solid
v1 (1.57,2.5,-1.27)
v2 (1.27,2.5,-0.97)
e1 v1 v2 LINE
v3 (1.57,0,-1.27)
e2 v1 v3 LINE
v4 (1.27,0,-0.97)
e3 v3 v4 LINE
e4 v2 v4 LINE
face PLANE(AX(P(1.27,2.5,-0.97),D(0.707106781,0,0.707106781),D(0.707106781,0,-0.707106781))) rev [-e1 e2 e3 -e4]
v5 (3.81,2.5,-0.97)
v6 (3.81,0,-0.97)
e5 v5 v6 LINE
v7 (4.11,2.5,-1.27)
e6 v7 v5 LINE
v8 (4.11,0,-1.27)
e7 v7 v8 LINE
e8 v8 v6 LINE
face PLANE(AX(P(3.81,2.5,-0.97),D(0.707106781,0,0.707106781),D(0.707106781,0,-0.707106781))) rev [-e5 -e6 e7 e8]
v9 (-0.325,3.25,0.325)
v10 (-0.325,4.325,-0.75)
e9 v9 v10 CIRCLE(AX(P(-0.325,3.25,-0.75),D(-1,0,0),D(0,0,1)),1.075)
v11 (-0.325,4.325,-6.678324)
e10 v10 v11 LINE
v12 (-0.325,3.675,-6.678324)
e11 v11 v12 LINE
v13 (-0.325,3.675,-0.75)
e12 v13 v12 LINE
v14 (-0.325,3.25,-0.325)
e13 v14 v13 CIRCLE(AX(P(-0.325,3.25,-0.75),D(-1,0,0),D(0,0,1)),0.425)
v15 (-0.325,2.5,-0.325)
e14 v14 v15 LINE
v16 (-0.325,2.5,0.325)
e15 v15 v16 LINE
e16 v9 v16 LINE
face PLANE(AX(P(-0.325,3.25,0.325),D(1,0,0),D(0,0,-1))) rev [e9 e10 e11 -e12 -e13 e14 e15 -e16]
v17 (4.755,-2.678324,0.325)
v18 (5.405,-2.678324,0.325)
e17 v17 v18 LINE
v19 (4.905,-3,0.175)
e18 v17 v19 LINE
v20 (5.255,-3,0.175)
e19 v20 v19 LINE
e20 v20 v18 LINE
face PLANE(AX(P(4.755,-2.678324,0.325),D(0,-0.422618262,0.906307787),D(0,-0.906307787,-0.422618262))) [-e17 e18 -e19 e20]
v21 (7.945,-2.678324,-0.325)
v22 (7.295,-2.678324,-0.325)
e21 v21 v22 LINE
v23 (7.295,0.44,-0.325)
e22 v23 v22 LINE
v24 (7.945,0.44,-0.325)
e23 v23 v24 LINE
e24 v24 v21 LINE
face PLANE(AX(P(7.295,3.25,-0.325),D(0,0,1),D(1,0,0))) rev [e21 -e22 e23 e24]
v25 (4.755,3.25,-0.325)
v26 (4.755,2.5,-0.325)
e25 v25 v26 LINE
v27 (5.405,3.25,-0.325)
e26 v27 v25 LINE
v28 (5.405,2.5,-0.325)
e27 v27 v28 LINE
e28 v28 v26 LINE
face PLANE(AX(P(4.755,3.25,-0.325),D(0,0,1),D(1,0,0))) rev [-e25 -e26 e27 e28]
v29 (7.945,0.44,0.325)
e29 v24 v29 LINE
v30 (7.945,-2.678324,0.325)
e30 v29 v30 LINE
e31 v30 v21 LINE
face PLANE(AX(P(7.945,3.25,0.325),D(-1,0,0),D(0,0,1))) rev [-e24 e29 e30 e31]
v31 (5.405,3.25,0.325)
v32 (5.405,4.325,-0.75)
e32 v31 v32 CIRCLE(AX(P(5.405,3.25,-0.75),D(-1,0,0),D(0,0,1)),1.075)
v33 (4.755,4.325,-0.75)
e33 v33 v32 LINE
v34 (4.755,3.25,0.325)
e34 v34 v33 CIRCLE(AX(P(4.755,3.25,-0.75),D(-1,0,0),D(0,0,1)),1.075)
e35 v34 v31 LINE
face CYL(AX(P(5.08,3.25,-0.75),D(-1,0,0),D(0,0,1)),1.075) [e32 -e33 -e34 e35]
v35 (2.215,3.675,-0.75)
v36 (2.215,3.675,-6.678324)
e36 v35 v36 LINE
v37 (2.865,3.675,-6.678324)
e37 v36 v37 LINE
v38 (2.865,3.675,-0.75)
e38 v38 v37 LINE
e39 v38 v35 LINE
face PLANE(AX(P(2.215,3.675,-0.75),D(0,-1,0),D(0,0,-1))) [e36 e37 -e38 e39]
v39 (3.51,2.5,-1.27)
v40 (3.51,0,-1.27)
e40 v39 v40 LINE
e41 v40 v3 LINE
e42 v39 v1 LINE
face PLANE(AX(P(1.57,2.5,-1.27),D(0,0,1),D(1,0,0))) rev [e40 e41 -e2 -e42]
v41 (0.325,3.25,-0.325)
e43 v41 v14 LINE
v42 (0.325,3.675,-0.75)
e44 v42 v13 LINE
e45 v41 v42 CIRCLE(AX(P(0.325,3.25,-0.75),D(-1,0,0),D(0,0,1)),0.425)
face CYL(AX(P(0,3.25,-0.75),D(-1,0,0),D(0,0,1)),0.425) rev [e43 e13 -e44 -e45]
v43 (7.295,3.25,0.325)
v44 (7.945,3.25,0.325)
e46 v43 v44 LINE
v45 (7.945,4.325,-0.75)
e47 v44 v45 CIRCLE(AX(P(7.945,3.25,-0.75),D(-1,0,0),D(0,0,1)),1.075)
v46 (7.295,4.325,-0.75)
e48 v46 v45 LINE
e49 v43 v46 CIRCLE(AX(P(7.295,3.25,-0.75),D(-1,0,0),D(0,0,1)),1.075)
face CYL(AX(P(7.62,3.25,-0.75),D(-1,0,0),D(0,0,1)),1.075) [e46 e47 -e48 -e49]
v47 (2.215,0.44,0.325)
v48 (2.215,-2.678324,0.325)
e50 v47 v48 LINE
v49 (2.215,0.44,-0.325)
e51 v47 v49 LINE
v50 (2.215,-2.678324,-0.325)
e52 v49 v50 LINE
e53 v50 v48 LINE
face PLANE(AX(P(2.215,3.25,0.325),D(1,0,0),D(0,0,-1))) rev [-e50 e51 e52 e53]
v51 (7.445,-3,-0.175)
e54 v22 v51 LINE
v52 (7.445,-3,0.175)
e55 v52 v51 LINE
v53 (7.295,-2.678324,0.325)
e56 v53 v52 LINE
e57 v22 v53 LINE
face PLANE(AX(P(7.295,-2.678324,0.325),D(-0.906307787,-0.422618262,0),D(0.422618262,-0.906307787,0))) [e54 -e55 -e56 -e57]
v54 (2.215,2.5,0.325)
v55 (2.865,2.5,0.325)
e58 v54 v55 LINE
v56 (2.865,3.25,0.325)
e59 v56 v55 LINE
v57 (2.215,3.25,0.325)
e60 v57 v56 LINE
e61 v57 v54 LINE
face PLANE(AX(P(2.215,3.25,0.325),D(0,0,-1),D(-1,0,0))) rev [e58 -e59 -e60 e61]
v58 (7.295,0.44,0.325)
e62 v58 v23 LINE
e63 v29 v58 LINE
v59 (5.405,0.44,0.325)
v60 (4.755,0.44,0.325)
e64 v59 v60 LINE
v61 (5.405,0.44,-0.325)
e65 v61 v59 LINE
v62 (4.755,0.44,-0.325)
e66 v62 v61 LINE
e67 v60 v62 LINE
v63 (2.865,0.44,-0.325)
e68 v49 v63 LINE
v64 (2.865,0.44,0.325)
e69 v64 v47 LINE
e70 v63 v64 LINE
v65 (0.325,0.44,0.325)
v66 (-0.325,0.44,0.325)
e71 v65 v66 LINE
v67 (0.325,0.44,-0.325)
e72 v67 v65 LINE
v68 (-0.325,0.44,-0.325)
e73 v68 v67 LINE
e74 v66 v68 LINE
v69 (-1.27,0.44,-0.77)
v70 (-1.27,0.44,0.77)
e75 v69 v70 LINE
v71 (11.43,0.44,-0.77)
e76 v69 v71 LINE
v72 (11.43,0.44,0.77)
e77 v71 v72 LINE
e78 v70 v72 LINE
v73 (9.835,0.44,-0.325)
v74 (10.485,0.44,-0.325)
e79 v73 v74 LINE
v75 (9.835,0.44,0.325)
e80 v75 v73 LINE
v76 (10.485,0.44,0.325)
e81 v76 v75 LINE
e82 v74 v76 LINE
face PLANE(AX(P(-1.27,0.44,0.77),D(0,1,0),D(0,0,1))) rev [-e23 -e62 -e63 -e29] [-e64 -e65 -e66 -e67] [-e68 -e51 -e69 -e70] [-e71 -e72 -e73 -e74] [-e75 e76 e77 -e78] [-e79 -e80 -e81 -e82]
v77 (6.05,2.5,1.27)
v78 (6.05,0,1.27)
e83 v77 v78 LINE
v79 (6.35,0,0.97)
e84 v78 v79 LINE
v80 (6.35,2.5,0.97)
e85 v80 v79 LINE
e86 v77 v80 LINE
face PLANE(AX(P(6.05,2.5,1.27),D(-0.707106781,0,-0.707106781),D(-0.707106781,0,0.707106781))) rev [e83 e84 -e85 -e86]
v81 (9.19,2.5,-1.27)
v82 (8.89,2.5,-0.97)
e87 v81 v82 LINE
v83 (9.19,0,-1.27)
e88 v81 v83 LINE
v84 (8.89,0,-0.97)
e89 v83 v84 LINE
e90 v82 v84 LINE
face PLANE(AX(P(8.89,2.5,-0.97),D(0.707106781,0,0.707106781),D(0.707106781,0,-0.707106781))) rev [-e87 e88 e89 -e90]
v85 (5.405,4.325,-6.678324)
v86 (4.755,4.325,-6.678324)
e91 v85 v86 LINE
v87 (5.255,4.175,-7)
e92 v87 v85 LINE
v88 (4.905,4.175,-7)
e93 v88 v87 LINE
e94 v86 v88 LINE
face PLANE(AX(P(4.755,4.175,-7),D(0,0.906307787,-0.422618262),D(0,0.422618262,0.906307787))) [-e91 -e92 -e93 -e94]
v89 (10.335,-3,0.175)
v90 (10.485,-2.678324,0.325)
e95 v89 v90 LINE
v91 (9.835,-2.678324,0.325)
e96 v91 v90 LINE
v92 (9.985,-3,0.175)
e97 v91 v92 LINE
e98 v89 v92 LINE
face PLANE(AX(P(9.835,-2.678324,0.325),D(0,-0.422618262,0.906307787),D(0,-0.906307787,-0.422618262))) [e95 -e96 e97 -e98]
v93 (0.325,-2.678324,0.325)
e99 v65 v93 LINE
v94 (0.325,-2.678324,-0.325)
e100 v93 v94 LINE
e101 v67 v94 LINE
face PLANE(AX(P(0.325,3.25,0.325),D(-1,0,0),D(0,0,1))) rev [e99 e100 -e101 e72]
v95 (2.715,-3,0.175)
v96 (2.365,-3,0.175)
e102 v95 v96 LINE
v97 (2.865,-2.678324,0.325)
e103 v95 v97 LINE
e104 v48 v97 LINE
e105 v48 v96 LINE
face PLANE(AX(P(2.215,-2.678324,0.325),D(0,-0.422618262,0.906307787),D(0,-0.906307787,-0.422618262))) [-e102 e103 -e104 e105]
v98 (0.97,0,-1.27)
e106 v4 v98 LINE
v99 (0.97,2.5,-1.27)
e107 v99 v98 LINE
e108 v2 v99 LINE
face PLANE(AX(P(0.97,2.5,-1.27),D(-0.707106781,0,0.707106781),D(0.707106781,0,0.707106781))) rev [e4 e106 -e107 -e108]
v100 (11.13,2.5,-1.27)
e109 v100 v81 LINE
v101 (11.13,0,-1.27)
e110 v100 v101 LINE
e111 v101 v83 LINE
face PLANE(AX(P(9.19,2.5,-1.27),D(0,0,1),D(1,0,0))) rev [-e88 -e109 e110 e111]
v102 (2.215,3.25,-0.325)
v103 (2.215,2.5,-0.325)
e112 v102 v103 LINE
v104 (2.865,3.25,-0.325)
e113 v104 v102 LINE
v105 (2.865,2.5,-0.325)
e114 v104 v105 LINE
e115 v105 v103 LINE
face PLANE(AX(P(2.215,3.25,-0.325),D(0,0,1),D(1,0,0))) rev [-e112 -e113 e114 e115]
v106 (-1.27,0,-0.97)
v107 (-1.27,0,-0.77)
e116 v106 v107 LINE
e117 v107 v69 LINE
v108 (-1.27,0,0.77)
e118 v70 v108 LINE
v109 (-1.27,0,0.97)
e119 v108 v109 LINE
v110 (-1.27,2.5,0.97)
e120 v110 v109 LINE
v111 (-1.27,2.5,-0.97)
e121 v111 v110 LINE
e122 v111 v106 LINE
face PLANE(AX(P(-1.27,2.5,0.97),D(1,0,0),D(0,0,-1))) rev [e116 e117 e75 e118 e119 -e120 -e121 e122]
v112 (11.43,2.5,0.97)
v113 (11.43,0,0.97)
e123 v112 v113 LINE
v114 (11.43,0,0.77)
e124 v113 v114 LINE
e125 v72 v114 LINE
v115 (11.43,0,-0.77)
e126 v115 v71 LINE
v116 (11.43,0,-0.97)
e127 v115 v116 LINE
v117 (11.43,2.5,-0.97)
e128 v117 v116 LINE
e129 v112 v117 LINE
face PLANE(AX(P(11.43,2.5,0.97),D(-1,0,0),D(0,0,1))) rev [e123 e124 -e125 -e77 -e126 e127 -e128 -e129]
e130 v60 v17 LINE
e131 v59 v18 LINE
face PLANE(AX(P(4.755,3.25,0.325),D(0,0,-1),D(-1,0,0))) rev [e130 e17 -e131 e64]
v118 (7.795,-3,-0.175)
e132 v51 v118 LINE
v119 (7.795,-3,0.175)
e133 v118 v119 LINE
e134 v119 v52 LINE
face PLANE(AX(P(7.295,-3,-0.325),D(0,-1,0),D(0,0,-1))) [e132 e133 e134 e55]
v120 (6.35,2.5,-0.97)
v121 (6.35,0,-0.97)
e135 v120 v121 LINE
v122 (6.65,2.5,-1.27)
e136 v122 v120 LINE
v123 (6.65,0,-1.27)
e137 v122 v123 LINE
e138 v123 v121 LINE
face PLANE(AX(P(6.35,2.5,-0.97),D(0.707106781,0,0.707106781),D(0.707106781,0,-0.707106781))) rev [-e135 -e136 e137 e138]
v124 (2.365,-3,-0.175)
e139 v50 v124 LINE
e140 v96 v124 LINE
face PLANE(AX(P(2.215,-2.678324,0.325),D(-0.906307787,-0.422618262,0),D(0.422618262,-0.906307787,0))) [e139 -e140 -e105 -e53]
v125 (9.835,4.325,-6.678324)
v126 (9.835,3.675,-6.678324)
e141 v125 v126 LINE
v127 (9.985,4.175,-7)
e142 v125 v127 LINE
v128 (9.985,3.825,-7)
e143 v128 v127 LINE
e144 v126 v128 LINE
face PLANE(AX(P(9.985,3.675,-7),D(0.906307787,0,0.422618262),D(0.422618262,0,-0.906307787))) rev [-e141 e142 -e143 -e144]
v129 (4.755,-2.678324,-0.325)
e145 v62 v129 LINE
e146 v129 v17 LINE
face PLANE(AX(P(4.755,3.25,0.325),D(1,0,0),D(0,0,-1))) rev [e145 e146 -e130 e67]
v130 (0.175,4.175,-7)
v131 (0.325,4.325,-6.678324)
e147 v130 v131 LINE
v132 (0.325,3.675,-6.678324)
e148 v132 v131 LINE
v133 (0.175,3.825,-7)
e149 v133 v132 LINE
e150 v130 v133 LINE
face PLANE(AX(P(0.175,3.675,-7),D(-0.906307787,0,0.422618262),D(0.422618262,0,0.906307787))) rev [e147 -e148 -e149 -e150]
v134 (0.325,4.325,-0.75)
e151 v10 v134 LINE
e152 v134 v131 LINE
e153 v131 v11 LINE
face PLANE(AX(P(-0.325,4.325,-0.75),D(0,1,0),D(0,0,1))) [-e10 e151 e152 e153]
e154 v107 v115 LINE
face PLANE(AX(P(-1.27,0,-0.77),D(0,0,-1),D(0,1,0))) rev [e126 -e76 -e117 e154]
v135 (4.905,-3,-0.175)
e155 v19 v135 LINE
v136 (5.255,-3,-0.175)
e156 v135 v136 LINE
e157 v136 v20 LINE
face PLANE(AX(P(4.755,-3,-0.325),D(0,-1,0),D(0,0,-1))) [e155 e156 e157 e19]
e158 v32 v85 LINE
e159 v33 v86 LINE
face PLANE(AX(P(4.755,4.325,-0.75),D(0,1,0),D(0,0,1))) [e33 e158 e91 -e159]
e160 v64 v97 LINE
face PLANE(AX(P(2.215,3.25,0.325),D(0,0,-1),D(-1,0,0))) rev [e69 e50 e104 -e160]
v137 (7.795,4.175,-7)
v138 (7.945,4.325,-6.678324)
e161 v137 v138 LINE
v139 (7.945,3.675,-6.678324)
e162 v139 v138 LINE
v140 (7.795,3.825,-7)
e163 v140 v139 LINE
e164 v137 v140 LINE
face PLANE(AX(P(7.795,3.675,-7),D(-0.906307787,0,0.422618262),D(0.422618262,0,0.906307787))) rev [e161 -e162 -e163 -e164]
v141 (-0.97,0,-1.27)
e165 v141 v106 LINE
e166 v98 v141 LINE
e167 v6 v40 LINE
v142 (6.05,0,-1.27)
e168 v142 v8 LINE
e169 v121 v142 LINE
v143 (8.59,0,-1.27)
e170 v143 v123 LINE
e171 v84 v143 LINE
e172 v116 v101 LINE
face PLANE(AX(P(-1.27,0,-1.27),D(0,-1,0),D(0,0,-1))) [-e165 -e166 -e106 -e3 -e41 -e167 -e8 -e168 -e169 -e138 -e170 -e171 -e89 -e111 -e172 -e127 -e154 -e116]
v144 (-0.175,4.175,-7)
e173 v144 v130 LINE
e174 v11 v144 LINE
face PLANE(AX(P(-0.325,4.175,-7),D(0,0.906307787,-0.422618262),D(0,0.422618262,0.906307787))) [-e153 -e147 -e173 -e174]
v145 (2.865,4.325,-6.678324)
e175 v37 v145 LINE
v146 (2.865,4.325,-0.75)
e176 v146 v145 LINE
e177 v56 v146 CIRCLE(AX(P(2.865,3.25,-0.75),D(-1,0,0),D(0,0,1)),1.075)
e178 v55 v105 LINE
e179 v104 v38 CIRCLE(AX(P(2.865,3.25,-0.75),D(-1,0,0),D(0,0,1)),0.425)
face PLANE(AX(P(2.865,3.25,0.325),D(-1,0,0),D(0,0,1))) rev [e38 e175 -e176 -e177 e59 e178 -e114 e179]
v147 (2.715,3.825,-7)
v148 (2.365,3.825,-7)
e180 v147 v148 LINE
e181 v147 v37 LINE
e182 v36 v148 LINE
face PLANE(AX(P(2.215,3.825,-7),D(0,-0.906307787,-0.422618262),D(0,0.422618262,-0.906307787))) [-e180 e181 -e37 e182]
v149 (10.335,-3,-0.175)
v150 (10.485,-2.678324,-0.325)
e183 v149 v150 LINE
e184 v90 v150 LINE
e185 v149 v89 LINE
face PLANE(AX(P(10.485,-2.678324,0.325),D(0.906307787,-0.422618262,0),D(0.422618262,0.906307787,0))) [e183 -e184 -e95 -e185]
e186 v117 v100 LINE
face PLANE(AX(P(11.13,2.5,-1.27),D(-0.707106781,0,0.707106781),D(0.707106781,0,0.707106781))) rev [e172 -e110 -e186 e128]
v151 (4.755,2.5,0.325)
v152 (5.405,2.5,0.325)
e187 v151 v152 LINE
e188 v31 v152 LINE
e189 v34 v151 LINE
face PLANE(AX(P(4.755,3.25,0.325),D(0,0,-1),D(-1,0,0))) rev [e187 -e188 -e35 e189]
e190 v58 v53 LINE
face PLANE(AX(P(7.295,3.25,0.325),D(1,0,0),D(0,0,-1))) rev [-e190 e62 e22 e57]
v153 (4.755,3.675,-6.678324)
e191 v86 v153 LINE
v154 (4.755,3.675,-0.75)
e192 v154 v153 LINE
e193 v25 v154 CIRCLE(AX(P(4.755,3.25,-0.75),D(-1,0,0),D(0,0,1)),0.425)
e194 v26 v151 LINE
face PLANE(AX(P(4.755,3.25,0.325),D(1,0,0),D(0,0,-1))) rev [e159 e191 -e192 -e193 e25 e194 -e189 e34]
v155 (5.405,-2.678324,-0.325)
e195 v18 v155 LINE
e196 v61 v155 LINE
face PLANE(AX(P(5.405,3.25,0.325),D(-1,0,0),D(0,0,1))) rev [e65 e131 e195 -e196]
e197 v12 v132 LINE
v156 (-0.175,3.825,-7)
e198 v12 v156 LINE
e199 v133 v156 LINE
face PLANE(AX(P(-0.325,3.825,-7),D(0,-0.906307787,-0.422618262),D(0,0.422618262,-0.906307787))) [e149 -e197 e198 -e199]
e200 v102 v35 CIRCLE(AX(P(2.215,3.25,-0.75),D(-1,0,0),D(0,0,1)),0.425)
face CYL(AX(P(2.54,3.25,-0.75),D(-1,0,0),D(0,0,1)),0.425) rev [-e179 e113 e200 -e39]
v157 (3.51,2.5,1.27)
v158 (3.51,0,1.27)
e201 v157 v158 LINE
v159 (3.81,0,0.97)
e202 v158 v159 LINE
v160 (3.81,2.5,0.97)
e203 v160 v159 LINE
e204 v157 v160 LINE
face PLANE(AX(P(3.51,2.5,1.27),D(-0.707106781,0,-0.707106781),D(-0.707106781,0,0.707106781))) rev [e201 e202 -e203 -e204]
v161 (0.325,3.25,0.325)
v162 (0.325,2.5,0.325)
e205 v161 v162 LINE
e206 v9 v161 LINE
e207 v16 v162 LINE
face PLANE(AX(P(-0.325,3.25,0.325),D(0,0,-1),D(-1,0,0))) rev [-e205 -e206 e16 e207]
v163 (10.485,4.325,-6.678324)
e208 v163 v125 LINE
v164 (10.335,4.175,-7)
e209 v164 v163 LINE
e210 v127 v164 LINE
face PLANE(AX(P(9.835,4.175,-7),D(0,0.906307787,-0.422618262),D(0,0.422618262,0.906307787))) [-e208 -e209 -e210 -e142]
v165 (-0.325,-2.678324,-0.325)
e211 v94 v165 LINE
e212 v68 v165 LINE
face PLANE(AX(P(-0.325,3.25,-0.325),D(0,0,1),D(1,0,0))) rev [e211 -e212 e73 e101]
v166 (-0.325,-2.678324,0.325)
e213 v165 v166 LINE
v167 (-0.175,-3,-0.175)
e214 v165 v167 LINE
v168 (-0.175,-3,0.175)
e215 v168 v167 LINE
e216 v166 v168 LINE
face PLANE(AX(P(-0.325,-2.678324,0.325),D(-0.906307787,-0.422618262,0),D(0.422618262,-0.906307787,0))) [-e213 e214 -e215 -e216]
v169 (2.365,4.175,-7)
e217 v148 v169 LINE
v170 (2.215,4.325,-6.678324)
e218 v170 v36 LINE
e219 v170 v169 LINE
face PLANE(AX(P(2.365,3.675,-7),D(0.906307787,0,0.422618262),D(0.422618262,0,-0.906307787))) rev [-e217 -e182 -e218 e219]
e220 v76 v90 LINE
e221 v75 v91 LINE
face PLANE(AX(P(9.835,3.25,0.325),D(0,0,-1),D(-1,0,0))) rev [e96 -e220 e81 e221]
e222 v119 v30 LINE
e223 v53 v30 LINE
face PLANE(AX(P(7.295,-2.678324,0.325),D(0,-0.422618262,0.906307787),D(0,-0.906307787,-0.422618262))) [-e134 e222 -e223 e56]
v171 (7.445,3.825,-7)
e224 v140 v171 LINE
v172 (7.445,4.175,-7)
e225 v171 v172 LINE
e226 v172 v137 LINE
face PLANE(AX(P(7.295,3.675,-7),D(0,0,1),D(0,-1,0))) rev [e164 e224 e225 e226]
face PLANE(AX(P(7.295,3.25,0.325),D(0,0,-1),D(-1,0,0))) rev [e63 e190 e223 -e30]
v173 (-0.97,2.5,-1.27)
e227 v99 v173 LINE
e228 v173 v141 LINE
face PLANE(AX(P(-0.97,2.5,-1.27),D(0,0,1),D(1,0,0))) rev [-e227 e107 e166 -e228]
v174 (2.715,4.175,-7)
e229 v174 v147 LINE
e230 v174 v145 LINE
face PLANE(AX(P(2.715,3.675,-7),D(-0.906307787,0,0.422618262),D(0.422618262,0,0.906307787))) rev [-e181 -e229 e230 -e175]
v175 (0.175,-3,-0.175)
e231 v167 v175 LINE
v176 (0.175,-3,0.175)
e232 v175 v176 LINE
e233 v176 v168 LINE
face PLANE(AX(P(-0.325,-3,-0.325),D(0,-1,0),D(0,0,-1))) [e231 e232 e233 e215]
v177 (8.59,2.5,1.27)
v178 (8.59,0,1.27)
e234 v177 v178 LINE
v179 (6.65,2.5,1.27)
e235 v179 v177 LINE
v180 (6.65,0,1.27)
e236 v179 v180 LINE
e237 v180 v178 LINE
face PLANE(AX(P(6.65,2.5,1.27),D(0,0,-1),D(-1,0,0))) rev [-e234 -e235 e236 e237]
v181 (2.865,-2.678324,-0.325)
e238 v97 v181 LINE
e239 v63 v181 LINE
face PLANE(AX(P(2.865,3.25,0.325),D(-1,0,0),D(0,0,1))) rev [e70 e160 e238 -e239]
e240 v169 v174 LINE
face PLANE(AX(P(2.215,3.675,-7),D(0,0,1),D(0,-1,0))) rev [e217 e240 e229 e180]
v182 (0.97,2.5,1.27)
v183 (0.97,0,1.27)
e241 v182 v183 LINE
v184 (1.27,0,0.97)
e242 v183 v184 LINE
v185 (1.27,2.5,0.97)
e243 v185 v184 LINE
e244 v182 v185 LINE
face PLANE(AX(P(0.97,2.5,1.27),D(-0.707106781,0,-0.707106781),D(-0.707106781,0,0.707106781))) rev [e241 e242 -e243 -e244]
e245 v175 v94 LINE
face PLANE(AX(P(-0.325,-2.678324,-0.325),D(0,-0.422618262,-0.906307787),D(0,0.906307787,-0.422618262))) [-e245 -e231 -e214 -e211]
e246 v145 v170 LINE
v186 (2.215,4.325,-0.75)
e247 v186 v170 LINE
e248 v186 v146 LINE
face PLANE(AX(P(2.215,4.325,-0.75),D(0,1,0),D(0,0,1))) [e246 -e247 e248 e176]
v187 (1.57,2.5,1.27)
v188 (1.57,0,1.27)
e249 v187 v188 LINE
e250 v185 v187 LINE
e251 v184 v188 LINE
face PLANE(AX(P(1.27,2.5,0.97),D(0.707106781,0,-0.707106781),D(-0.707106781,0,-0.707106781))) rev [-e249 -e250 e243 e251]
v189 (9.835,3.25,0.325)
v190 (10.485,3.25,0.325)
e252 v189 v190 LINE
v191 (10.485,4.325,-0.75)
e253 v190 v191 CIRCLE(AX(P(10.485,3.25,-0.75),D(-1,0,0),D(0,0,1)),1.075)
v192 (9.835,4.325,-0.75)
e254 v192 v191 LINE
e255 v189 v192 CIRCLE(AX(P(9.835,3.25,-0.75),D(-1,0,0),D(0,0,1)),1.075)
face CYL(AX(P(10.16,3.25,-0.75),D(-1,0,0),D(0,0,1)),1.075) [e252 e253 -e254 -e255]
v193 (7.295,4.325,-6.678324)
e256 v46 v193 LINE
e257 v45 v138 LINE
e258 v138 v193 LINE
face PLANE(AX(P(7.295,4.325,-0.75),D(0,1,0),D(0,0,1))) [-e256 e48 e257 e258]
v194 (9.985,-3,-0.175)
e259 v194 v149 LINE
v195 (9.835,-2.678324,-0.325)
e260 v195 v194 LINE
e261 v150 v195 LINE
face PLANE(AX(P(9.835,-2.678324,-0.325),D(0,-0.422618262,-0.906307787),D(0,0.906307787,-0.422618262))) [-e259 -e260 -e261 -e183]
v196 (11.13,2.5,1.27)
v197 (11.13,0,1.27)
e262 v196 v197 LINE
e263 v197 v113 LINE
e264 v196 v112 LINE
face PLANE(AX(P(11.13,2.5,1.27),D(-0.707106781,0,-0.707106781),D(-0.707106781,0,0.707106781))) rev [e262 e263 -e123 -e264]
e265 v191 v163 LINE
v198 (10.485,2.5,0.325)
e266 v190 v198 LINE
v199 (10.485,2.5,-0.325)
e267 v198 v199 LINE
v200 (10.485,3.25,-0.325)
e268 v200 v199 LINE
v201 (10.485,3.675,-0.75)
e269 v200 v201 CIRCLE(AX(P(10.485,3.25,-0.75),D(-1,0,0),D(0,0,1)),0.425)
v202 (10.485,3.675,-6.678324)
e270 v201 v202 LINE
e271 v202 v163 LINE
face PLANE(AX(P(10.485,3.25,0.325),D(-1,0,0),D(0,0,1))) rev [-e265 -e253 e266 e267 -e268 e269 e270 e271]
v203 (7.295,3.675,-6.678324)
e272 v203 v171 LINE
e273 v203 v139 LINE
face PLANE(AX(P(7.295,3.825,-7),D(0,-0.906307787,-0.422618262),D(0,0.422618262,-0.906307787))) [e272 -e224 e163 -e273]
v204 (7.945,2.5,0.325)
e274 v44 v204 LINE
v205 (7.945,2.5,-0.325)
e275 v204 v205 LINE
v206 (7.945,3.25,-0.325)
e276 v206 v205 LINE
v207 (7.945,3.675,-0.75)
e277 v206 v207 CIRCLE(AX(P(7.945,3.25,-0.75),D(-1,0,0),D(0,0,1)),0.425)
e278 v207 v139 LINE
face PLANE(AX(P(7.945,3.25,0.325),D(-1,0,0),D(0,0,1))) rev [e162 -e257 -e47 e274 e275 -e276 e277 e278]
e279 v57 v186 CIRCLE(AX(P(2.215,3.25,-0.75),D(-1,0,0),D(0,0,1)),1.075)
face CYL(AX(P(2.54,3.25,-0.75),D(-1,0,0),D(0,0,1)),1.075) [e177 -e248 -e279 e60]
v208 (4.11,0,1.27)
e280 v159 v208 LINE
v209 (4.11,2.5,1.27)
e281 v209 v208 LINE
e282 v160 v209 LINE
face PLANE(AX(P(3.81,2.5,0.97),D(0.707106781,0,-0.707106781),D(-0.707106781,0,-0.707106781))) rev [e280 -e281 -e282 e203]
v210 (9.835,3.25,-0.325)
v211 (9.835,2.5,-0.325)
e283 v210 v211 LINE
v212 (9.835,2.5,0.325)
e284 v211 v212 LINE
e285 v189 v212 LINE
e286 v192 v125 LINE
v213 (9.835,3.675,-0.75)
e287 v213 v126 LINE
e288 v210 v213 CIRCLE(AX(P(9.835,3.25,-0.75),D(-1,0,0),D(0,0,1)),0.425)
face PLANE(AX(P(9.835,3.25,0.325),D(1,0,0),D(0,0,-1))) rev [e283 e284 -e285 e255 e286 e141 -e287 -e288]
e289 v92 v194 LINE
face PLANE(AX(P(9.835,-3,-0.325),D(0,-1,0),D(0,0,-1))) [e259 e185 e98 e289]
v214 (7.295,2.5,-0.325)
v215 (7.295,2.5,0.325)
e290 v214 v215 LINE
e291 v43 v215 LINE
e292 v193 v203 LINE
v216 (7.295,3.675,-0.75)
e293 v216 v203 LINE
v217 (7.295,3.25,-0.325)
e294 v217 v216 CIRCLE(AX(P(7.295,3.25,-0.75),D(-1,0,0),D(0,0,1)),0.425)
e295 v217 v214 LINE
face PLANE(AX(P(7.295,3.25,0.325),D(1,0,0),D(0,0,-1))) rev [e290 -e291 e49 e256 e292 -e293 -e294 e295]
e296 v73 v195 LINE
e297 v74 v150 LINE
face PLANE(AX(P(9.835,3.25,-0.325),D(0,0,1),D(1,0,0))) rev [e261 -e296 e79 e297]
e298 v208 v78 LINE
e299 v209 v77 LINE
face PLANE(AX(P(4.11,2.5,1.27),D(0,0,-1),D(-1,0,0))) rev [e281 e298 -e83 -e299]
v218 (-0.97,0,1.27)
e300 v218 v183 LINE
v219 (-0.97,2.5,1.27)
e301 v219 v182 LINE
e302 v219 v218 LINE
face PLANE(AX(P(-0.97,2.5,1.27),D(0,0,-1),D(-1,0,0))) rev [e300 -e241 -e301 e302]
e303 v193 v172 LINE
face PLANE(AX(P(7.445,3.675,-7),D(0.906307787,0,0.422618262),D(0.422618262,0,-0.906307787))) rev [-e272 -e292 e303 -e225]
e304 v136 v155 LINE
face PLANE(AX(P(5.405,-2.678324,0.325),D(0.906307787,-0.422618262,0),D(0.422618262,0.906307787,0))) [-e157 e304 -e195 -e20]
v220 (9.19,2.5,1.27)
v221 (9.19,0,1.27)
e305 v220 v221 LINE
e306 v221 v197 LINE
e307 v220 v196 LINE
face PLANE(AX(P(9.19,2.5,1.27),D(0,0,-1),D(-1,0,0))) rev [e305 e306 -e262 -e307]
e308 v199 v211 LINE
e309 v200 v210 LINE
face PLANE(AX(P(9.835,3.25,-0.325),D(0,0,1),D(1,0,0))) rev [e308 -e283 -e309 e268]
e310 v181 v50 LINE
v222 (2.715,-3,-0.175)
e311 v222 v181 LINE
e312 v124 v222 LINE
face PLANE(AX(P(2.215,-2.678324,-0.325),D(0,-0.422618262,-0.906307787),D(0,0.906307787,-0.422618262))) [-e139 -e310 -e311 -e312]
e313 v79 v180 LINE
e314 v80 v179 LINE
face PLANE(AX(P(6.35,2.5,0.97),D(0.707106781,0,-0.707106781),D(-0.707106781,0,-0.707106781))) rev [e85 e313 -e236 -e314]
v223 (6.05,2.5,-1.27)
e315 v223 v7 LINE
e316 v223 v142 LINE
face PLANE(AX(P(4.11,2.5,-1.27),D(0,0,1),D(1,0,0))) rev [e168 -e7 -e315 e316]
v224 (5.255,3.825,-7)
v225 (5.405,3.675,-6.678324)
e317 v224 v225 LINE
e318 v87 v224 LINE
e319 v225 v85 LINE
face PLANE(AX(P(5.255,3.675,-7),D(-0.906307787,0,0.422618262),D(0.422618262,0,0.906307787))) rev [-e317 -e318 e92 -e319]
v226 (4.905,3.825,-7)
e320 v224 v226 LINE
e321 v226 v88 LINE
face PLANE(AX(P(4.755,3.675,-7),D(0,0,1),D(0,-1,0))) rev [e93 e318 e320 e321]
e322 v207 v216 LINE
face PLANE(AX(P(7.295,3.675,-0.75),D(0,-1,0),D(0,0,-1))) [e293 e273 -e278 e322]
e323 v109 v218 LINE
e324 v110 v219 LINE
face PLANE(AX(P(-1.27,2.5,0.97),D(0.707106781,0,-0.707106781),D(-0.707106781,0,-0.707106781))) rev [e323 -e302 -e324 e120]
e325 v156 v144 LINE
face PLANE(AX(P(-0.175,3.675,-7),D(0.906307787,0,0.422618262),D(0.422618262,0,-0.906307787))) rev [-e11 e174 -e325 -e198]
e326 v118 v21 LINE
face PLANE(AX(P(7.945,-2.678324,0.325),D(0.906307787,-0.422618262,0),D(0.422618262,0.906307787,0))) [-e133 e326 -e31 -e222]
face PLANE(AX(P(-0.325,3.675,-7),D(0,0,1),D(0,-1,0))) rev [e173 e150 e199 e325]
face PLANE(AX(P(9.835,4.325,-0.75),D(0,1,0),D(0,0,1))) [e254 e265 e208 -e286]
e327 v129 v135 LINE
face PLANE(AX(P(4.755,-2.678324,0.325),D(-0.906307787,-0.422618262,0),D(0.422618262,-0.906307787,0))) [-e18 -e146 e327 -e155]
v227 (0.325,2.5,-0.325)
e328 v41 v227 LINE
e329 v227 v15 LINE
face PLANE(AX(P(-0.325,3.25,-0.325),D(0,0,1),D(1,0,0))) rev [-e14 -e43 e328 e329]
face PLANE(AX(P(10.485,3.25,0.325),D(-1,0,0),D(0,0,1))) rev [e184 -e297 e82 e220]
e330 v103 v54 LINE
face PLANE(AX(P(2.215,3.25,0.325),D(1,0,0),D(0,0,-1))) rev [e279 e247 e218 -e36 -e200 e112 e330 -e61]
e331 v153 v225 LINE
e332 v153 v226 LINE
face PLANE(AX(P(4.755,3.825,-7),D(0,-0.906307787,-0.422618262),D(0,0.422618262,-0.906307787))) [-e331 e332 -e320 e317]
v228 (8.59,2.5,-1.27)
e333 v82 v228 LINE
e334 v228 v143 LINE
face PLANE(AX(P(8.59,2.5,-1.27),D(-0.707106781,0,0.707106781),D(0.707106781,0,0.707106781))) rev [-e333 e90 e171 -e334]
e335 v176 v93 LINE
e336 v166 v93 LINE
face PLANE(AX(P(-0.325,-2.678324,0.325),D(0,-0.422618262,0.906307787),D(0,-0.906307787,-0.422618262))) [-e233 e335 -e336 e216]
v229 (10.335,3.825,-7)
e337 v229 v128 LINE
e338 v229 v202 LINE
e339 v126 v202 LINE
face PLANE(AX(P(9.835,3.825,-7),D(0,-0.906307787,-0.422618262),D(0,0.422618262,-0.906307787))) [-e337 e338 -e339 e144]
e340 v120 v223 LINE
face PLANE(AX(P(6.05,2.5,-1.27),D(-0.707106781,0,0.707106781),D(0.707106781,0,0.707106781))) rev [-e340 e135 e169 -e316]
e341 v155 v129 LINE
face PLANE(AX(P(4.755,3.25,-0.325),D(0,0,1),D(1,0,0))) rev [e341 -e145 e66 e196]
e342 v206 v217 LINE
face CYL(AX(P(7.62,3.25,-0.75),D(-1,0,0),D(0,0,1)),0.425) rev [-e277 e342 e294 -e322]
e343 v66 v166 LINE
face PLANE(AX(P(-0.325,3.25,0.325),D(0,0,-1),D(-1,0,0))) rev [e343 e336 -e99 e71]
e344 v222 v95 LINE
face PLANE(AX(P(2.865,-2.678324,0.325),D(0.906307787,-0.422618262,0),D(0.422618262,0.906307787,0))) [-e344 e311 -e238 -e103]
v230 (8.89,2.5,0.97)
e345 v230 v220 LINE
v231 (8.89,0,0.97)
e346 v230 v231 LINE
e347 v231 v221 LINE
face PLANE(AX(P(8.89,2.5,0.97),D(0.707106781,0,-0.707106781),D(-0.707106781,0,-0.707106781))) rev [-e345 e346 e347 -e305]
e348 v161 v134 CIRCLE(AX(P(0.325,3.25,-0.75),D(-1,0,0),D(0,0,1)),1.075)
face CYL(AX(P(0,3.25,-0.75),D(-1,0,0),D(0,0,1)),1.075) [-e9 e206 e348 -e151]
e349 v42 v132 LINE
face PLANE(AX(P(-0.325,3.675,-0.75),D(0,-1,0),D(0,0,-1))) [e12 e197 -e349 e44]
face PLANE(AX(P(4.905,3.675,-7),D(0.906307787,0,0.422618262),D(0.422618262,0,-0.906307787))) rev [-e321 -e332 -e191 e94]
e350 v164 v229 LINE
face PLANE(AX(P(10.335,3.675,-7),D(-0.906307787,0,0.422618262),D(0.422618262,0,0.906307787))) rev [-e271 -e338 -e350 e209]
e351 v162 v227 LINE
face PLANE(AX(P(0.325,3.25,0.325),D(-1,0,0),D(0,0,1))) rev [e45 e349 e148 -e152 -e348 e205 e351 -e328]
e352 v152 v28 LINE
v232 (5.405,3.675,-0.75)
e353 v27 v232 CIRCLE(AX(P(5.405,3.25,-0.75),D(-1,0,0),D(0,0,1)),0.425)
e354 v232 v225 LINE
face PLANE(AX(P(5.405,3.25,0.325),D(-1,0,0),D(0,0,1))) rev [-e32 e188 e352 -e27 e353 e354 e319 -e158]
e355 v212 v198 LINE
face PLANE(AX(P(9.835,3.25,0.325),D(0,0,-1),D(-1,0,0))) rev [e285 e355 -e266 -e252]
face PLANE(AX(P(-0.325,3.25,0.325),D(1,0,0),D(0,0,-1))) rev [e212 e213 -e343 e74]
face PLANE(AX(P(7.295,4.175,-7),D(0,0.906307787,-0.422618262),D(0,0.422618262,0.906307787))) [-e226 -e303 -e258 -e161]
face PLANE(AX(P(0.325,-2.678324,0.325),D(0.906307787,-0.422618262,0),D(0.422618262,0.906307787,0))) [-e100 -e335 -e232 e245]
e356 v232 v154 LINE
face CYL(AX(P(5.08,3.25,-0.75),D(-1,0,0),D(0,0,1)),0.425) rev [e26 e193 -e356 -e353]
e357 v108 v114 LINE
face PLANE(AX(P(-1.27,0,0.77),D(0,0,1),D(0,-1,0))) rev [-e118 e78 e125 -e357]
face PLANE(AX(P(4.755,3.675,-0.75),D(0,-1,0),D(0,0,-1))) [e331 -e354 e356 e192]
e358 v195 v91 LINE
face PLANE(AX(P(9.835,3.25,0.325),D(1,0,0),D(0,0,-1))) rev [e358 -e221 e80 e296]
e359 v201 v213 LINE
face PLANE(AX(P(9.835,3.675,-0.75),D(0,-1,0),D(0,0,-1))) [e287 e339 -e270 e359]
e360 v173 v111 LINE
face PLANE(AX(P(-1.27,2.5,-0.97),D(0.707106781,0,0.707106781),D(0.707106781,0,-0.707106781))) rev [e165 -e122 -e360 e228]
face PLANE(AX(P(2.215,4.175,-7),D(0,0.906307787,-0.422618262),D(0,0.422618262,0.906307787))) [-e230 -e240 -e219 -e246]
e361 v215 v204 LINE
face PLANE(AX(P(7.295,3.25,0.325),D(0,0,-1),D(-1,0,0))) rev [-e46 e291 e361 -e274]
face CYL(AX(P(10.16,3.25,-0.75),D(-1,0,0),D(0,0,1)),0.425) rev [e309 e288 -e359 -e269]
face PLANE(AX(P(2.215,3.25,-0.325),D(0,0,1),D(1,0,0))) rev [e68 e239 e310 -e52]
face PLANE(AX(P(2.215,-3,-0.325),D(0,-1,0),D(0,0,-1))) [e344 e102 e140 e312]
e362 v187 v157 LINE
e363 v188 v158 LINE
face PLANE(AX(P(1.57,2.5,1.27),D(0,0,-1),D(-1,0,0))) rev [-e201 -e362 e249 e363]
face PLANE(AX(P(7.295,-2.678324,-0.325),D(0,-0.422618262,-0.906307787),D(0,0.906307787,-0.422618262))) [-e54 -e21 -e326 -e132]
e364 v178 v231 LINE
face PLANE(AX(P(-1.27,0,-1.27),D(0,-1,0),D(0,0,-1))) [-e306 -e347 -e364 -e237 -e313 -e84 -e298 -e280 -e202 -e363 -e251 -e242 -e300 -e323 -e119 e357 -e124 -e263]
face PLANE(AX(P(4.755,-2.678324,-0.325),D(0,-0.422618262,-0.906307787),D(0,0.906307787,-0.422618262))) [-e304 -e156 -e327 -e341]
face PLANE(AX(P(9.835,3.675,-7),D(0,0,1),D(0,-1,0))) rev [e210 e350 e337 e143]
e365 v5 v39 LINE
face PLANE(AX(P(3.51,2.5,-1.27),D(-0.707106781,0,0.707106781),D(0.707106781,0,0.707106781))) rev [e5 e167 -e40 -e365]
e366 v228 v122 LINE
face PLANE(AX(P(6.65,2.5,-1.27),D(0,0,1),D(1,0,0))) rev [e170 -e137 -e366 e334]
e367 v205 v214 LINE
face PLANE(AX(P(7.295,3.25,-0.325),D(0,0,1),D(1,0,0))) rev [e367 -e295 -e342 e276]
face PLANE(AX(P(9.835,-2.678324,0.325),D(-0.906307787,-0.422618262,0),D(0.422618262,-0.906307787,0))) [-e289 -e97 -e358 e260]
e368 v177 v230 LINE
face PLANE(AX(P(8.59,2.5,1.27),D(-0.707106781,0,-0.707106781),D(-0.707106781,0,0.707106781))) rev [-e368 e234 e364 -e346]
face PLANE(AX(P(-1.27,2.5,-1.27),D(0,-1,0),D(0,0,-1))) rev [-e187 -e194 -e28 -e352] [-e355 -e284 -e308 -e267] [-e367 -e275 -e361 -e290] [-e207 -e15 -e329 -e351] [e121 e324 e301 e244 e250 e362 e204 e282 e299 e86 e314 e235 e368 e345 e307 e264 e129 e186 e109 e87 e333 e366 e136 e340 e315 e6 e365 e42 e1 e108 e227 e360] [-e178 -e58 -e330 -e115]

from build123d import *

# Parameters (mm, degrees)
BASE_DEPTH          = 2.5
BASE_PATTERN_COUNT  = 5
BASE_PATTERN_PITCH  = 2.54
CUT_DEPTH           = 12.768933682
CUT_DEPTH_BACK      = 12.768933682
SKETCH2_W           = 1.54
SKETCH2_H           = 0.44
SKETCH3_W           = 0.65
SKETCH3_H           = 0.65
PIN_CHAMFER_SIZE    = 0.15
PIN_CHAMFER_SIZE2   = 0.321676038
CHAMFER1_SIZE       = 0.15
CHAMFER1_SIZE2      = 0.321676038
PIN_START           = 2.215
PIN_PATTERN_DEPTH   = 0.65
PIN_START_2         = 4.755
PIN_PATTERN_2_DEPTH = 0.65
PIN_START_3         = 7.295
PIN_PATTERN_3_DEPTH = 0.65
PIN_START_4         = 9.835
PIN_PATTERN_4_DEPTH = 0.65
PIN_START_5         = -6.678323962
PIN_PATTERN_5_DEPTH = 7.678323962
PIN_START_6         = 2.5
PIN_PATTERN_6_DEPTH = 2.5


with BuildPart() as part:
    # Sketch1 → Base (new body)
    with BuildSketch(Plane(origin=(0, 0, 0), x_dir=(1, 0, 0), z_dir=(0, 1, 0))):
        Polygon((-1.27, 0.97), (-0.97, 1.27), (0.97, 1.27), (1.27, 0.97), (1.27, -0.97), (0.97, -1.27), (-0.97, -1.27), (-1.27, -0.97), align=None)
    base = extrude(amount=BASE_DEPTH)

    # Base_Pattern: Base ×5
    with Locations(*[(i * BASE_PATTERN_PITCH, 0, 0) for i in range(1, BASE_PATTERN_COUNT)]):
        add(base)

    # Sketch2 → Cut (cut, two sides: drawn at the far end of the back side and taken through both)
    with BuildSketch(Plane(origin=(0, 0, 0), x_dir=(0, 0, -1), z_dir=(1, 0, 0)).offset(-CUT_DEPTH_BACK)):
        with Locations((0, 0.22)):
            Rectangle(SKETCH2_W, SKETCH2_H)
    extrude(amount=CUT_DEPTH + CUT_DEPTH_BACK, mode=Mode.SUBTRACT)

    # Sweep1: sweep along a path in Sketch4
    with BuildLine(Plane(origin=(0, 0, 0), x_dir=(0, 0, -1), z_dir=(1, 0, 0))) as sweep1_path:
        Line((0, -3), (0, 3.25))
        ThreePointArc((0, 3.25), (0.219669914, 3.780330086), (0.75, 4))
        Line((0.75, 4), (7, 4))
    # Sketch3 → Sweep1 (sweep)
    with BuildSketch(Plane(origin=(0, -3, 0), x_dir=(1, 0, 0), z_dir=(0, 1, 0))):
        Rectangle(SKETCH3_W, SKETCH3_H)
    sweep(path=sweep1_path.line)

    # Pin Chamfer
    pin_chamfer_edges = [part.edges().sort_by_distance(p)[0] for p in [
        (0.325, -3, 0),
        (0, -3, -0.325),
        (-0.325, -3, 0),
        (0, -3, 0.325),
    ]]
    pin_chamfer_side = [part.faces().sort_by_distance(p)[0] for p in [
        (0, -3, 0),
    ]]
    chamfer(pin_chamfer_edges, length=PIN_CHAMFER_SIZE, length2=PIN_CHAMFER_SIZE2, reference=pin_chamfer_side[0])

    # Chamfer1
    chamfer1_edges = [part.edges().sort_by_distance(p)[0] for p in [
        (-0.325, 4, -7),
        (0, 4.325, -7),
        (0.325, 4, -7),
        (0, 3.675, -7),
    ]]
    chamfer1_side = [part.faces().sort_by_distance(p)[0] for p in [
        (0, 4, -7),
    ]]
    chamfer(chamfer1_edges, length=CHAMFER1_SIZE, length2=CHAMFER1_SIZE2, reference=chamfer1_side[0])

    # Pin Pattern: read off the stored shape, not the designer's step
    # Pin Pattern outline → Pin Pattern (add)
    with BuildSketch(Plane.YZ.offset(PIN_START)):
        Polygon((-2.678323962, 0.325), (-3, 0.175), (-3, -0.175), (-2.678323962, -0.325), (0.44, -0.325), (0.44, 0.325), align=None)
        with BuildLine():
            Line((2.5, -0.325), (3.25, -0.325))
            ThreePointArc((3.25, -0.325), (3.550520382, -0.449479618), (3.675, -0.75))
            Line((3.675, -0.75), (3.675, -6.678323962))
            Line((3.675, -6.678323962), (3.825, -7))
            Line((3.825, -7), (4.175, -7))
            Line((4.175, -7), (4.325, -6.678323962))
            Line((4.325, -6.678323962), (4.325, -0.75))
            ThreePointArc((4.325, -0.75), (4.01013979, 0.01013979), (3.25, 0.325))
            Line((3.25, 0.325), (2.5, 0.325))
            Line((2.5, 0.325), (2.5, -0.325))
        make_face()
    extrude(amount=PIN_PATTERN_DEPTH)

    # Pin Pattern 2 outline → Pin Pattern 2 (add)
    with BuildSketch(Plane.YZ.offset(PIN_START_2)):
        Polygon((-2.678323962, 0.325), (-3, 0.175), (-3, -0.175), (-2.678323962, -0.325), (0.44, -0.325), (0.44, 0.325), align=None)
        with BuildLine():
            Line((2.5, -0.325), (3.25, -0.325))
            ThreePointArc((3.25, -0.325), (3.550520382, -0.449479618), (3.675, -0.75))
            Line((3.675, -0.75), (3.675, -6.678323962))
            Line((3.675, -6.678323962), (3.825, -7))
            Line((3.825, -7), (4.175, -7))
            Line((4.175, -7), (4.325, -6.678323962))
            Line((4.325, -6.678323962), (4.325, -0.75))
            ThreePointArc((4.325, -0.75), (4.01013979, 0.01013979), (3.25, 0.325))
            Line((3.25, 0.325), (2.5, 0.325))
            Line((2.5, 0.325), (2.5, -0.325))
        make_face()
    extrude(amount=PIN_PATTERN_2_DEPTH)

    # Pin Pattern 3 outline → Pin Pattern 3 (add)
    with BuildSketch(Plane.YZ.offset(PIN_START_3)):
        Polygon((-2.678323962, 0.325), (-3, 0.175), (-3, -0.175), (-2.678323962, -0.325), (0.44, -0.325), (0.44, 0.325), align=None)
        with BuildLine():
            Line((2.5, -0.325), (3.25, -0.325))
            ThreePointArc((3.25, -0.325), (3.550520382, -0.449479618), (3.675, -0.75))
            Line((3.675, -0.75), (3.675, -6.678323962))
            Line((3.675, -6.678323962), (3.825, -7))
            Line((3.825, -7), (4.175, -7))
            Line((4.175, -7), (4.325, -6.678323962))
            Line((4.325, -6.678323962), (4.325, -0.75))
            ThreePointArc((4.325, -0.75), (4.01013979, 0.01013979), (3.25, 0.325))
            Line((3.25, 0.325), (2.5, 0.325))
            Line((2.5, 0.325), (2.5, -0.325))
        make_face()
    extrude(amount=PIN_PATTERN_3_DEPTH)

    # Pin Pattern 4 outline → Pin Pattern 4 (add)
    with BuildSketch(Plane.YZ.offset(PIN_START_4)):
        Polygon((-2.678323962, 0.325), (-3, 0.175), (-3, -0.175), (-2.678323962, -0.325), (0.44, -0.325), (0.44, 0.325), align=None)
        with BuildLine():
            Line((2.5, -0.325), (3.25, -0.325))
            ThreePointArc((3.25, -0.325), (3.550520382, -0.449479618), (3.675, -0.75))
            Line((3.675, -0.75), (3.675, -6.678323962))
            Line((3.675, -6.678323962), (3.825, -7))
            Line((3.825, -7), (4.175, -7))
            Line((4.175, -7), (4.325, -6.678323962))
            Line((4.325, -6.678323962), (4.325, -0.75))
            ThreePointArc((4.325, -0.75), (4.01013979, 0.01013979), (3.25, 0.325))
            Line((3.25, 0.325), (2.5, 0.325))
            Line((2.5, 0.325), (2.5, -0.325))
        make_face()
    extrude(amount=PIN_PATTERN_4_DEPTH)

    # Pin Pattern 5 outline → Pin Pattern 5 (cut)
    with BuildSketch(Plane.XY.offset(PIN_START_5)):
        Polygon((2.865, -2.678323962), (2.715, -3), (2.865, -3), align=None)
        Polygon((2.365, -3), (2.215, -2.678323962), (2.215, -3), align=None)
        Polygon((5.405, -2.678323962), (5.255, -3), (5.405, -3), align=None)
        Polygon((4.905, -3), (4.755, -2.678323962), (4.755, -3), align=None)
        Polygon((7.945, -2.678323962), (7.795, -3), (7.945, -3), align=None)
        Polygon((7.445, -3), (7.295, -2.678323962), (7.295, -3), align=None)
        Polygon((10.485, -2.678323962), (10.335, -3), (10.485, -3), align=None)
        Polygon((9.985, -3), (9.835, -2.678323962), (9.835, -3), align=None)
    extrude(amount=PIN_PATTERN_5_DEPTH, mode=Mode.SUBTRACT)

    # Pin Pattern 6 outline → Pin Pattern 6 (cut)
    with BuildSketch(Plane(origin=(0, 0, 0), x_dir=(1, 0, 0), z_dir=(0, 1, 0)).offset(PIN_START_6)):
        Polygon((2.865, 7), (2.715, 7), (2.865, 6.678323962), align=None)
        Polygon((2.215, 6.678323962), (2.365, 7), (2.215, 7), align=None)
        Polygon((5.405, 7), (5.255, 7), (5.405, 6.678323962), align=None)
        Polygon((4.755, 6.678323962), (4.905, 7), (4.755, 7), align=None)
        Polygon((7.945, 7), (7.795, 7), (7.945, 6.678323962), align=None)
        Polygon((7.295, 6.678323962), (7.445, 7), (7.295, 7), align=None)
        Polygon((10.485, 7), (10.335, 7), (10.485, 6.678323962), align=None)
        Polygon((9.835, 6.678323962), (9.985, 7), (9.835, 7), align=None)
    extrude(amount=PIN_PATTERN_6_DEPTH, mode=Mode.SUBTRACT)


solid = part.part
